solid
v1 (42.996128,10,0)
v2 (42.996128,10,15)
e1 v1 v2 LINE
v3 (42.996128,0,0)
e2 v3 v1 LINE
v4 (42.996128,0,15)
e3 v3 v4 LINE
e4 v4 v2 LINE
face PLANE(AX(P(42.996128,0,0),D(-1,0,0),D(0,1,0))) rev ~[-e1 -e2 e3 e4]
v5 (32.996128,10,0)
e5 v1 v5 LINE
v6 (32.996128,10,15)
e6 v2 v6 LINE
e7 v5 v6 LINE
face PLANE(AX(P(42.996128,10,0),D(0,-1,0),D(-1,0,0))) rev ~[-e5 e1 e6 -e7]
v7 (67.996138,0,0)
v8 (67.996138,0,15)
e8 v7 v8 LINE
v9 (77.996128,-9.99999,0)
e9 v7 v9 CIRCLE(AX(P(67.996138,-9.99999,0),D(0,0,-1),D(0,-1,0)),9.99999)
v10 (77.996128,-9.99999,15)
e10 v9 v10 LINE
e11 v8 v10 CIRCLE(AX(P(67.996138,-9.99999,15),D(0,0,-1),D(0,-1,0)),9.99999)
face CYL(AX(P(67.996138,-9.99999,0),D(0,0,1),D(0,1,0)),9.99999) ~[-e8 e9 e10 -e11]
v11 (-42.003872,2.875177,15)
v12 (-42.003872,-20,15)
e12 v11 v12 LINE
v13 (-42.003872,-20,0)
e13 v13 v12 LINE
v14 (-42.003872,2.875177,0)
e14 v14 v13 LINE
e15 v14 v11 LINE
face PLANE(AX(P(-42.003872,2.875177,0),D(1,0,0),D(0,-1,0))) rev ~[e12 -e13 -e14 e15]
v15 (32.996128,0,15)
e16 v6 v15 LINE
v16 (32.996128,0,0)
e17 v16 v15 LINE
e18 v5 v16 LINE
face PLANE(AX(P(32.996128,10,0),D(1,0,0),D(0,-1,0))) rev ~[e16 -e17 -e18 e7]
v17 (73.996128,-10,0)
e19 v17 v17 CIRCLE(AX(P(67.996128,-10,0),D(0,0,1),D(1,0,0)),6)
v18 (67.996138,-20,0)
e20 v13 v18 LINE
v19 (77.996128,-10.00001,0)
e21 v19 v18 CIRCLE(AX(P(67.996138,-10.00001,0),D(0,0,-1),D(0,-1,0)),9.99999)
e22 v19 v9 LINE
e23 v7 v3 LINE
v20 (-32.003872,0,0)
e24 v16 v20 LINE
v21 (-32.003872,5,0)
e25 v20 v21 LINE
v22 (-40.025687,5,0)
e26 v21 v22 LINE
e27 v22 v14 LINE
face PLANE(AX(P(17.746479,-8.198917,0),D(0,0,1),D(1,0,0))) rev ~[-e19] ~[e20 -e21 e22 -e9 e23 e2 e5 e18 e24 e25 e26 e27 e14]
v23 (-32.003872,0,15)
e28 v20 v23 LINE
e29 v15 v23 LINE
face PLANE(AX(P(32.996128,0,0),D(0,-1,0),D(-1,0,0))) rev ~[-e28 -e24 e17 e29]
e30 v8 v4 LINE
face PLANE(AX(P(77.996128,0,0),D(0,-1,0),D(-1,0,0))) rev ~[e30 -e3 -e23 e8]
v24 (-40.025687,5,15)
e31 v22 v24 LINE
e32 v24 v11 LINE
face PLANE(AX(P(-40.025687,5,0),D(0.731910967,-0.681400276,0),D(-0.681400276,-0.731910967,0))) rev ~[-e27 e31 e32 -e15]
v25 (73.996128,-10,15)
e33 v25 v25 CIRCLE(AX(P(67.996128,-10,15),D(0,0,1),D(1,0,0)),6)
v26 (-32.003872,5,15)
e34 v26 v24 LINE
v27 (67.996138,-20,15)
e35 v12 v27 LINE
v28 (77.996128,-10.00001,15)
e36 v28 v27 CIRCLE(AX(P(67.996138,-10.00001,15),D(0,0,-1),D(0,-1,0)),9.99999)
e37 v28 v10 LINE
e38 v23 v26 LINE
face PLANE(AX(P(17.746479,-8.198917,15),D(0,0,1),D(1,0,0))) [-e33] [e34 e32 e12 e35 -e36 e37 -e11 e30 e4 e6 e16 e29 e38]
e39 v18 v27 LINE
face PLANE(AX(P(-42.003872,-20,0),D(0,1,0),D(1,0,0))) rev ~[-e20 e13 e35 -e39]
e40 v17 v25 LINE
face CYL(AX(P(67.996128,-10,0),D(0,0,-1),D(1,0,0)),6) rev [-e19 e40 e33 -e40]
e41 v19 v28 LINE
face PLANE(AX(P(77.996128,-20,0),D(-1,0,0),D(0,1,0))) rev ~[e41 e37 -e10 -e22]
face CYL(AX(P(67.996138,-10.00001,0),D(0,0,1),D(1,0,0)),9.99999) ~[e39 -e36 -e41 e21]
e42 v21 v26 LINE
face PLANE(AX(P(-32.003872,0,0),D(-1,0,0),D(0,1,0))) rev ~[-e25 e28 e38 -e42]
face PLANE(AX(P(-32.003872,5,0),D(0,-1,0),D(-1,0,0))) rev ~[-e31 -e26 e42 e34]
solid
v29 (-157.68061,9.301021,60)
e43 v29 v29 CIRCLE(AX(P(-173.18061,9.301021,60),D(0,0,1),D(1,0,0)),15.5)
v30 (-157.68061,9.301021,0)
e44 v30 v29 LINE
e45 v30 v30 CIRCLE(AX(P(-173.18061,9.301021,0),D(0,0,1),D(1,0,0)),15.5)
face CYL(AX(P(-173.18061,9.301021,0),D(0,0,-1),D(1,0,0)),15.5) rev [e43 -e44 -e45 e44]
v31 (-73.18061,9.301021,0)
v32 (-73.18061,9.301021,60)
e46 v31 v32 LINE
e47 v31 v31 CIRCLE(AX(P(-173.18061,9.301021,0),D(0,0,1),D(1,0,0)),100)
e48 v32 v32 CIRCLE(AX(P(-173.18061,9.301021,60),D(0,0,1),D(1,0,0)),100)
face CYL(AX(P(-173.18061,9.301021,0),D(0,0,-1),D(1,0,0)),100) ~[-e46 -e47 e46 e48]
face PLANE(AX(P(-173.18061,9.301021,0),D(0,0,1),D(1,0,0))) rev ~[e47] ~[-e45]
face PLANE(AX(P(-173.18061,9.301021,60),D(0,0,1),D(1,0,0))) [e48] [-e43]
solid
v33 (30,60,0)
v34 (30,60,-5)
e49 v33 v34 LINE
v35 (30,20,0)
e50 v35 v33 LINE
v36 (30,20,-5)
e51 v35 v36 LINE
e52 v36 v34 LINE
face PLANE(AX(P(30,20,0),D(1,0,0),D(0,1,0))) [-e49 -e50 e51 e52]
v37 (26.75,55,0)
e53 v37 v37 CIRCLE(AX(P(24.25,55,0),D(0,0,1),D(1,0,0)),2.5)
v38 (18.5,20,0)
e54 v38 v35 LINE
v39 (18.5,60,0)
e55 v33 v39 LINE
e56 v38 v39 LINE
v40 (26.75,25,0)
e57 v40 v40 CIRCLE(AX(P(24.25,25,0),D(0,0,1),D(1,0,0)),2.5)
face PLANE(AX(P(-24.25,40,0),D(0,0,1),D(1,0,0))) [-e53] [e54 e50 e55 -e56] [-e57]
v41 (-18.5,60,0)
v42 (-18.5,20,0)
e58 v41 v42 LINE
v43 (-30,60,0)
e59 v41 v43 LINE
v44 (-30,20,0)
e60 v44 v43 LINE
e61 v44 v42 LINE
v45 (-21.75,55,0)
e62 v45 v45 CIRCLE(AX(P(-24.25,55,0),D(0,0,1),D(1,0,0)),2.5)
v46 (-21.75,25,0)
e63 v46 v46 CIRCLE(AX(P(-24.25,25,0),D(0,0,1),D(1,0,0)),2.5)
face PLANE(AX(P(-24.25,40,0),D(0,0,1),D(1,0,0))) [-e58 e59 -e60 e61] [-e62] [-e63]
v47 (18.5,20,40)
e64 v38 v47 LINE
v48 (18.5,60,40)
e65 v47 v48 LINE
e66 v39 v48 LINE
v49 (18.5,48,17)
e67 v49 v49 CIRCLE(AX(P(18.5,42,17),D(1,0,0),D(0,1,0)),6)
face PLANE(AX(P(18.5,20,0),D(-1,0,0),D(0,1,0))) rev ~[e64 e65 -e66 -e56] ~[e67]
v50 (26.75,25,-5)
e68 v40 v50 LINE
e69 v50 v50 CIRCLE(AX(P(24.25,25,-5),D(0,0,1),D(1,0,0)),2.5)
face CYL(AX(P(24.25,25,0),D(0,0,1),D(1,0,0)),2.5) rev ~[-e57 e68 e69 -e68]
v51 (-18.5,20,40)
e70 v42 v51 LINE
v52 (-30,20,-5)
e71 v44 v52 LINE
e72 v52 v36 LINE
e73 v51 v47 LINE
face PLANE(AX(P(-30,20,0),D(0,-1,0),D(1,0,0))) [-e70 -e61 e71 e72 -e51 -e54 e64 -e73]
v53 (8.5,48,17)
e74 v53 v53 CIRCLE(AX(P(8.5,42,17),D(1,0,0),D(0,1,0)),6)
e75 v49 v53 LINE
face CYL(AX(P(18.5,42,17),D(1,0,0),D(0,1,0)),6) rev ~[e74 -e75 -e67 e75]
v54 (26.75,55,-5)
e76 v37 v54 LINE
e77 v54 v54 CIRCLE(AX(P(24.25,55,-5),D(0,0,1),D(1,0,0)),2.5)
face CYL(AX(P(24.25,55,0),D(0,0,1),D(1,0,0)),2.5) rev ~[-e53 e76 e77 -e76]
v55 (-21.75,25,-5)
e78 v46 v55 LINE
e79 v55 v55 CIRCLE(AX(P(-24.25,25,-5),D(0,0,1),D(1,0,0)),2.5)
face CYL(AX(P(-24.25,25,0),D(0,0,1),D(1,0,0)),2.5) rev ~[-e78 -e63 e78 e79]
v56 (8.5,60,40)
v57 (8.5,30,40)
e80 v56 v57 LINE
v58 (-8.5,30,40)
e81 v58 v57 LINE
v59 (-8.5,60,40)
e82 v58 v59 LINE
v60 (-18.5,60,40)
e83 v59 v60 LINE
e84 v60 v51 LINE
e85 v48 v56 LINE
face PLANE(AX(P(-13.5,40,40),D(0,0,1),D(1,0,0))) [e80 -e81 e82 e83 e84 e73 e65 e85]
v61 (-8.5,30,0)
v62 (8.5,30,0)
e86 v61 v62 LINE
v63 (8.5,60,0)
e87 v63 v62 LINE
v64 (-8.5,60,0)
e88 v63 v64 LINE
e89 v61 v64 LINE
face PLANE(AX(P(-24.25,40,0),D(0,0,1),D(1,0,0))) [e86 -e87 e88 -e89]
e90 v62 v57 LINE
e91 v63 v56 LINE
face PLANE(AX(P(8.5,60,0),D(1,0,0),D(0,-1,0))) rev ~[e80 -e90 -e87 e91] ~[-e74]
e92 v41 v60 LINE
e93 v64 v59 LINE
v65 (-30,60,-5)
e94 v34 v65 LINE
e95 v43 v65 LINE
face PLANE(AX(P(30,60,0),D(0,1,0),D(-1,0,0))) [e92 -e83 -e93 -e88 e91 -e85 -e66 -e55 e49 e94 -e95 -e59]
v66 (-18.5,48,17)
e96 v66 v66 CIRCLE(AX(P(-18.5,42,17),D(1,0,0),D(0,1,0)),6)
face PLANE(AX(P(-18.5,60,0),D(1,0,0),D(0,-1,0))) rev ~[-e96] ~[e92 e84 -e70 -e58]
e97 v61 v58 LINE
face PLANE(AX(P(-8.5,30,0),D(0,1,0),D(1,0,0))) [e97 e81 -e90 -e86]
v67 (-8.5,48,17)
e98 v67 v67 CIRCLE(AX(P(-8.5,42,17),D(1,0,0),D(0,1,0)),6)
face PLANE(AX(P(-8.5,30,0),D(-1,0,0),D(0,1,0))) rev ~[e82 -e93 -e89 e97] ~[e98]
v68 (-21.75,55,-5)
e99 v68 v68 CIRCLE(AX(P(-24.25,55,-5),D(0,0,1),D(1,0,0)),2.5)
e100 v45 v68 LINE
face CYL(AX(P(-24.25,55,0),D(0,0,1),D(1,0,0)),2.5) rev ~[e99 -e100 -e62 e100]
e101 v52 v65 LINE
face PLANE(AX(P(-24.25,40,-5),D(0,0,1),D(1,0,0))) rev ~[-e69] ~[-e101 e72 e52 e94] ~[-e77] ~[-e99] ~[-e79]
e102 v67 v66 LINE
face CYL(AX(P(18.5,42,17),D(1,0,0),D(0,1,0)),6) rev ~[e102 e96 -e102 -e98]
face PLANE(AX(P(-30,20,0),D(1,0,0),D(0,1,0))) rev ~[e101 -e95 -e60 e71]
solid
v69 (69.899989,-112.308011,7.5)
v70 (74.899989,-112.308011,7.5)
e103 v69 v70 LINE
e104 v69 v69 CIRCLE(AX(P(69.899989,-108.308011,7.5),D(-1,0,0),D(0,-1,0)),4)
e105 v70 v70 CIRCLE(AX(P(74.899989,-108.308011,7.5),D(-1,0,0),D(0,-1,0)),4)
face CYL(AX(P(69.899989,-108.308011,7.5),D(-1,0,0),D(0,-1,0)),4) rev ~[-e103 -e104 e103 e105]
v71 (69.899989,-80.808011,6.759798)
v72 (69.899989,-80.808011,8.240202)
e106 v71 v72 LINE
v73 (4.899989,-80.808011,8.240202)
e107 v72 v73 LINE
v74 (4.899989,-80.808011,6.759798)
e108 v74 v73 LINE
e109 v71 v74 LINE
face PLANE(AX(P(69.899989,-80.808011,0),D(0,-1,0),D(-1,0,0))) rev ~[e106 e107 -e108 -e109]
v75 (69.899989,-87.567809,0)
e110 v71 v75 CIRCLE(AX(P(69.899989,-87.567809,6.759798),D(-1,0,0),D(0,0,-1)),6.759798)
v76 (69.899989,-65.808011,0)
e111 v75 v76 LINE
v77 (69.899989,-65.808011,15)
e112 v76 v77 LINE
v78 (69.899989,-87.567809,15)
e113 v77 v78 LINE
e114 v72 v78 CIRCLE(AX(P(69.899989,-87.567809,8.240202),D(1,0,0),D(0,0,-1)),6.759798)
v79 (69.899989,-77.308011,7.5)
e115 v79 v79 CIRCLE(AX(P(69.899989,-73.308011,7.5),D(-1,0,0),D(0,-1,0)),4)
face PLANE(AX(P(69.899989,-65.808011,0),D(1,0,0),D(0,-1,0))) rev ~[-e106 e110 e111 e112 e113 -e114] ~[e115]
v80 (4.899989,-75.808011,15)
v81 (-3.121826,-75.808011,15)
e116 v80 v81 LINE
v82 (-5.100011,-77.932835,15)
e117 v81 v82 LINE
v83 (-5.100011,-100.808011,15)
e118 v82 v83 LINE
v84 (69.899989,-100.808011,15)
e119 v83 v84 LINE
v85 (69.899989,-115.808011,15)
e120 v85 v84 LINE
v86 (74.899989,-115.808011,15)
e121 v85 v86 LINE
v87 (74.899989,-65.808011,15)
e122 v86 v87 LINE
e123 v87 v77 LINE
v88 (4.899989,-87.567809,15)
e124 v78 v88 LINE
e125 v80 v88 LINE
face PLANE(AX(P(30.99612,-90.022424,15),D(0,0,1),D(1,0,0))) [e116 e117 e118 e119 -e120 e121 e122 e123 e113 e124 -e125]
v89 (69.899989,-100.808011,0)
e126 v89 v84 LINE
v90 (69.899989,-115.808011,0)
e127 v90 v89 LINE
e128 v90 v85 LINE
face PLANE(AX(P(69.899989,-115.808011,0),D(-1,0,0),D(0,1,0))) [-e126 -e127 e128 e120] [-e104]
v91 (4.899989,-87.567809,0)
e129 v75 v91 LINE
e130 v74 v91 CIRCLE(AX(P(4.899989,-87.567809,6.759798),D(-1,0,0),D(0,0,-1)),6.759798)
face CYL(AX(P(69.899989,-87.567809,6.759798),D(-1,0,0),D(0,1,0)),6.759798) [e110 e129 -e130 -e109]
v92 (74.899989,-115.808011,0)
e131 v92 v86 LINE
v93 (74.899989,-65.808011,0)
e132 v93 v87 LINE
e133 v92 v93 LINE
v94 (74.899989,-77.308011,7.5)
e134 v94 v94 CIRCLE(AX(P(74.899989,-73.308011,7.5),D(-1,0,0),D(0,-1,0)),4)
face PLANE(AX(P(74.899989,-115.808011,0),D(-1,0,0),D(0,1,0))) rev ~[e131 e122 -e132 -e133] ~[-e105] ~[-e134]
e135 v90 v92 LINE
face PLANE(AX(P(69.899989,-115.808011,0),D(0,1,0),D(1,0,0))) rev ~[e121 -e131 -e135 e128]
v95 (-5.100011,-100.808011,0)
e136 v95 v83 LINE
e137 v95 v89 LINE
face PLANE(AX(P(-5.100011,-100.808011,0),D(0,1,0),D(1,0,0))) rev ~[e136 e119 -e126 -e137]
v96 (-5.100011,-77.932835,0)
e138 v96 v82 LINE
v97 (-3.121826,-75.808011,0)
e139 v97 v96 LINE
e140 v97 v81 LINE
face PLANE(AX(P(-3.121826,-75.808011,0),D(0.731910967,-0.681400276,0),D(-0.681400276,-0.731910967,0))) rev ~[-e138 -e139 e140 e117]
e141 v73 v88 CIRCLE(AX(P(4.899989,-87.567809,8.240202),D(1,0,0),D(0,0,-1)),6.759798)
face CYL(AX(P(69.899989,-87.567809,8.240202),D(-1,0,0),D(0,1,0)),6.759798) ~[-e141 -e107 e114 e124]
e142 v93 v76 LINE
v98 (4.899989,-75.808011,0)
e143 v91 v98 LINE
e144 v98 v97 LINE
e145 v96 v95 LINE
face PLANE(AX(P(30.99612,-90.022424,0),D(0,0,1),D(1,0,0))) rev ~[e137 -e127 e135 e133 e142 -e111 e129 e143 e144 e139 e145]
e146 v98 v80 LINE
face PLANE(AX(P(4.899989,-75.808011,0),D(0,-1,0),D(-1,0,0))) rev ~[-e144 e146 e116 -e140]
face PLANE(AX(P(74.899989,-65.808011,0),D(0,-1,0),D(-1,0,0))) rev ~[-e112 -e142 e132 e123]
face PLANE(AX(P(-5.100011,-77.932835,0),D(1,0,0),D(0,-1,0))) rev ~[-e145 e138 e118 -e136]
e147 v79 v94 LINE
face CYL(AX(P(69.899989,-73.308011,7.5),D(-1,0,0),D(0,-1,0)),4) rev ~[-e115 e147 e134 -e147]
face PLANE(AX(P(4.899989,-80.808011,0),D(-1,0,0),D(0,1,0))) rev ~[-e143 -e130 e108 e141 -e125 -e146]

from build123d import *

# Parameters (mm, degrees)
F0_R      = 6
F1_DEPTH  = 15
F0_W      = 11.5
F0_H      = 40
F0_R_2    = 2.5
F0_W_2    = 17
F0_H_2    = 10
F0_H_3    = 30
F2_DEPTH  = 5
F3_DEPTH  = 40
F4_R      = 9.99999
F5_R      = 6
F6_DEPTH  = 52.2
F0_R_3    = 100
F0_R_4    = 15.5
F7_DEPTH  = 60
F0_W_3    = 5
F0_H_4    = 15
F0_H_5    = 20
F8_DEPTH  = 15
F9_R      = 4
F10_DEPTH = 25
F11_R     = 6.7597979746


# Not quite as in the source:
# - a fillet or chamfer is up to 0.001 mm smaller than in the source, because OpenCascade refuses the exact size


with BuildPart() as f1:
    # F0 (on Top) → F1 (new body)
    with BuildSketch(Plane.XY):
        Polygon((32.9961277544, 0), (-32.0038722456, 0), (-32.0038722456, 5), (-40.0256873742, 5), (-42.0038722456, 2.8751766719), (-42.0038722456, 0), (-42.0038722456, -20), (77.9961277544, -20), (77.9961277544, 0), (42.9961277544, 0), (42.9961277544, 10), (32.9961277544, 10), align=None)
        with Locations((67.9961277544, -10)):
            Circle(F0_R, mode=Mode.SUBTRACT)
    extrude(amount=F1_DEPTH)

    # F4 (radius 10 in the source; OpenCascade refuses exactly that, so slightly less here)
    f4_edges = [f1.edges().sort_by_distance(p)[0] for p in [
        (77.996128, 0, 7.5),
        (77.996128, -20, 7.5),
    ]]
    fillet(f4_edges, radius=F4_R)


with BuildPart() as f2:
    # F0 (on Top) → F2 (new body)
    with BuildSketch(Plane.XY):
        with Locations((-24.25, 40)):
            Rectangle(F0_W, F0_H)
        with Locations((-24.25, 25)):
            Circle(F0_R_2, mode=Mode.SUBTRACT)
        with Locations((-24.25, 55)):
            Circle(F0_R_2, mode=Mode.SUBTRACT)
        Polygon((-8.5, 30), (-8.5, 60), (-18.5, 60), (-18.5, 20), (-8.5, 20), align=None)
        with Locations((0, 25)):
            Rectangle(F0_W_2, F0_H_2)
        Polygon((18.5, 20), (18.5, 60), (8.5, 60), (8.5, 30), (8.5, 20), align=None)
        with Locations((24.25, 40)):
            Rectangle(F0_W, F0_H)
        with Locations((24.25, 25)):
            Circle(F0_R_2, mode=Mode.SUBTRACT)
        with Locations((24.25, 55)):
            Circle(F0_R_2, mode=Mode.SUBTRACT)
        with Locations((0, 45)):
            Rectangle(F0_W_2, F0_H_3)
    extrude(amount=-F2_DEPTH)

    # F0 (on Top) → F3 (join)
    with BuildSketch(Plane.XY):
        Polygon((-8.5, 30), (-8.5, 60), (-18.5, 60), (-18.5, 20), (-8.5, 20), align=None)
        Polygon((18.5, 20), (18.5, 60), (8.5, 60), (8.5, 30), (8.5, 20), align=None)
        with Locations((0, 25)):
            Rectangle(F0_W_2, F0_H_2)
    extrude(amount=F3_DEPTH)

    # F5 (on face) → F6 (cut)
    with BuildSketch(Plane.YZ.offset(18.5)):
        with Locations((42, 17)):
            Circle(F5_R)
    extrude(amount=-F6_DEPTH, mode=Mode.SUBTRACT)


with BuildPart() as f7:
    # F0 (on Top) → F7 (new body)
    with BuildSketch(Plane.XY):
        with Locations((-173.1806099415, 9.3010207638)):
            Circle(F0_R_3)
        with Locations((-173.1806099415, 9.3010207638)):
            Circle(F0_R_4, mode=Mode.SUBTRACT)
    extrude(amount=F7_DEPTH)


with BuildPart() as f8:
    # F0 (on Top) → F8 (new body)
    with BuildSketch(Plane.XY):
        Polygon((59.8999890685, -80.8080112338), (4.8999890685, -80.8080112338), (4.8999890685, -75.8080112338), (-3.1218260601, -75.8080112338), (-5.1000109315, -77.9328345619), (-5.1000109315, -80.8080112338), (-5.1000109315, -100.8080112338), (69.8999890685, -100.8080112338), (69.8999890685, -80.8080112338), align=None)
        Polygon((69.8999890685, -70.8080112338), (69.8999890685, -80.8080112338), (74.8999890685, -80.8080112338), (74.8999890685, -65.8080112338), (69.8999890685, -65.8080112338), align=None)
        with Locations((72.3999890685, -108.3080112338)):
            Rectangle(F0_W_3, F0_H_4)
        with Locations((72.3999890685, -90.8080112338)):
            Rectangle(F0_W_3, F0_H_5)
    extrude(amount=F8_DEPTH)

    # F9 (on face) → F10 (cut)
    with BuildSketch(Plane(origin=(69.8999890685, 0, 0), x_dir=(0, -1, 0), z_dir=(-1, 0, 0))):
        with Locations((73.3080112338, 7.5)):
            Circle(F9_R)
        with Locations((108.3080112338, 7.5)):
            Circle(F9_R)
    extrude(amount=-F10_DEPTH, mode=Mode.SUBTRACT)

    # F11
    f11_edges = [f8.edges().sort_by_distance(p)[0] for p in [
        (37.399989, -80.808011, 0),
        (37.399989, -80.808011, 15),
    ]]
    fillet(f11_edges, radius=F11_R)


solid = Compound([f1.part, f2.part, f7.part, f8.part])
